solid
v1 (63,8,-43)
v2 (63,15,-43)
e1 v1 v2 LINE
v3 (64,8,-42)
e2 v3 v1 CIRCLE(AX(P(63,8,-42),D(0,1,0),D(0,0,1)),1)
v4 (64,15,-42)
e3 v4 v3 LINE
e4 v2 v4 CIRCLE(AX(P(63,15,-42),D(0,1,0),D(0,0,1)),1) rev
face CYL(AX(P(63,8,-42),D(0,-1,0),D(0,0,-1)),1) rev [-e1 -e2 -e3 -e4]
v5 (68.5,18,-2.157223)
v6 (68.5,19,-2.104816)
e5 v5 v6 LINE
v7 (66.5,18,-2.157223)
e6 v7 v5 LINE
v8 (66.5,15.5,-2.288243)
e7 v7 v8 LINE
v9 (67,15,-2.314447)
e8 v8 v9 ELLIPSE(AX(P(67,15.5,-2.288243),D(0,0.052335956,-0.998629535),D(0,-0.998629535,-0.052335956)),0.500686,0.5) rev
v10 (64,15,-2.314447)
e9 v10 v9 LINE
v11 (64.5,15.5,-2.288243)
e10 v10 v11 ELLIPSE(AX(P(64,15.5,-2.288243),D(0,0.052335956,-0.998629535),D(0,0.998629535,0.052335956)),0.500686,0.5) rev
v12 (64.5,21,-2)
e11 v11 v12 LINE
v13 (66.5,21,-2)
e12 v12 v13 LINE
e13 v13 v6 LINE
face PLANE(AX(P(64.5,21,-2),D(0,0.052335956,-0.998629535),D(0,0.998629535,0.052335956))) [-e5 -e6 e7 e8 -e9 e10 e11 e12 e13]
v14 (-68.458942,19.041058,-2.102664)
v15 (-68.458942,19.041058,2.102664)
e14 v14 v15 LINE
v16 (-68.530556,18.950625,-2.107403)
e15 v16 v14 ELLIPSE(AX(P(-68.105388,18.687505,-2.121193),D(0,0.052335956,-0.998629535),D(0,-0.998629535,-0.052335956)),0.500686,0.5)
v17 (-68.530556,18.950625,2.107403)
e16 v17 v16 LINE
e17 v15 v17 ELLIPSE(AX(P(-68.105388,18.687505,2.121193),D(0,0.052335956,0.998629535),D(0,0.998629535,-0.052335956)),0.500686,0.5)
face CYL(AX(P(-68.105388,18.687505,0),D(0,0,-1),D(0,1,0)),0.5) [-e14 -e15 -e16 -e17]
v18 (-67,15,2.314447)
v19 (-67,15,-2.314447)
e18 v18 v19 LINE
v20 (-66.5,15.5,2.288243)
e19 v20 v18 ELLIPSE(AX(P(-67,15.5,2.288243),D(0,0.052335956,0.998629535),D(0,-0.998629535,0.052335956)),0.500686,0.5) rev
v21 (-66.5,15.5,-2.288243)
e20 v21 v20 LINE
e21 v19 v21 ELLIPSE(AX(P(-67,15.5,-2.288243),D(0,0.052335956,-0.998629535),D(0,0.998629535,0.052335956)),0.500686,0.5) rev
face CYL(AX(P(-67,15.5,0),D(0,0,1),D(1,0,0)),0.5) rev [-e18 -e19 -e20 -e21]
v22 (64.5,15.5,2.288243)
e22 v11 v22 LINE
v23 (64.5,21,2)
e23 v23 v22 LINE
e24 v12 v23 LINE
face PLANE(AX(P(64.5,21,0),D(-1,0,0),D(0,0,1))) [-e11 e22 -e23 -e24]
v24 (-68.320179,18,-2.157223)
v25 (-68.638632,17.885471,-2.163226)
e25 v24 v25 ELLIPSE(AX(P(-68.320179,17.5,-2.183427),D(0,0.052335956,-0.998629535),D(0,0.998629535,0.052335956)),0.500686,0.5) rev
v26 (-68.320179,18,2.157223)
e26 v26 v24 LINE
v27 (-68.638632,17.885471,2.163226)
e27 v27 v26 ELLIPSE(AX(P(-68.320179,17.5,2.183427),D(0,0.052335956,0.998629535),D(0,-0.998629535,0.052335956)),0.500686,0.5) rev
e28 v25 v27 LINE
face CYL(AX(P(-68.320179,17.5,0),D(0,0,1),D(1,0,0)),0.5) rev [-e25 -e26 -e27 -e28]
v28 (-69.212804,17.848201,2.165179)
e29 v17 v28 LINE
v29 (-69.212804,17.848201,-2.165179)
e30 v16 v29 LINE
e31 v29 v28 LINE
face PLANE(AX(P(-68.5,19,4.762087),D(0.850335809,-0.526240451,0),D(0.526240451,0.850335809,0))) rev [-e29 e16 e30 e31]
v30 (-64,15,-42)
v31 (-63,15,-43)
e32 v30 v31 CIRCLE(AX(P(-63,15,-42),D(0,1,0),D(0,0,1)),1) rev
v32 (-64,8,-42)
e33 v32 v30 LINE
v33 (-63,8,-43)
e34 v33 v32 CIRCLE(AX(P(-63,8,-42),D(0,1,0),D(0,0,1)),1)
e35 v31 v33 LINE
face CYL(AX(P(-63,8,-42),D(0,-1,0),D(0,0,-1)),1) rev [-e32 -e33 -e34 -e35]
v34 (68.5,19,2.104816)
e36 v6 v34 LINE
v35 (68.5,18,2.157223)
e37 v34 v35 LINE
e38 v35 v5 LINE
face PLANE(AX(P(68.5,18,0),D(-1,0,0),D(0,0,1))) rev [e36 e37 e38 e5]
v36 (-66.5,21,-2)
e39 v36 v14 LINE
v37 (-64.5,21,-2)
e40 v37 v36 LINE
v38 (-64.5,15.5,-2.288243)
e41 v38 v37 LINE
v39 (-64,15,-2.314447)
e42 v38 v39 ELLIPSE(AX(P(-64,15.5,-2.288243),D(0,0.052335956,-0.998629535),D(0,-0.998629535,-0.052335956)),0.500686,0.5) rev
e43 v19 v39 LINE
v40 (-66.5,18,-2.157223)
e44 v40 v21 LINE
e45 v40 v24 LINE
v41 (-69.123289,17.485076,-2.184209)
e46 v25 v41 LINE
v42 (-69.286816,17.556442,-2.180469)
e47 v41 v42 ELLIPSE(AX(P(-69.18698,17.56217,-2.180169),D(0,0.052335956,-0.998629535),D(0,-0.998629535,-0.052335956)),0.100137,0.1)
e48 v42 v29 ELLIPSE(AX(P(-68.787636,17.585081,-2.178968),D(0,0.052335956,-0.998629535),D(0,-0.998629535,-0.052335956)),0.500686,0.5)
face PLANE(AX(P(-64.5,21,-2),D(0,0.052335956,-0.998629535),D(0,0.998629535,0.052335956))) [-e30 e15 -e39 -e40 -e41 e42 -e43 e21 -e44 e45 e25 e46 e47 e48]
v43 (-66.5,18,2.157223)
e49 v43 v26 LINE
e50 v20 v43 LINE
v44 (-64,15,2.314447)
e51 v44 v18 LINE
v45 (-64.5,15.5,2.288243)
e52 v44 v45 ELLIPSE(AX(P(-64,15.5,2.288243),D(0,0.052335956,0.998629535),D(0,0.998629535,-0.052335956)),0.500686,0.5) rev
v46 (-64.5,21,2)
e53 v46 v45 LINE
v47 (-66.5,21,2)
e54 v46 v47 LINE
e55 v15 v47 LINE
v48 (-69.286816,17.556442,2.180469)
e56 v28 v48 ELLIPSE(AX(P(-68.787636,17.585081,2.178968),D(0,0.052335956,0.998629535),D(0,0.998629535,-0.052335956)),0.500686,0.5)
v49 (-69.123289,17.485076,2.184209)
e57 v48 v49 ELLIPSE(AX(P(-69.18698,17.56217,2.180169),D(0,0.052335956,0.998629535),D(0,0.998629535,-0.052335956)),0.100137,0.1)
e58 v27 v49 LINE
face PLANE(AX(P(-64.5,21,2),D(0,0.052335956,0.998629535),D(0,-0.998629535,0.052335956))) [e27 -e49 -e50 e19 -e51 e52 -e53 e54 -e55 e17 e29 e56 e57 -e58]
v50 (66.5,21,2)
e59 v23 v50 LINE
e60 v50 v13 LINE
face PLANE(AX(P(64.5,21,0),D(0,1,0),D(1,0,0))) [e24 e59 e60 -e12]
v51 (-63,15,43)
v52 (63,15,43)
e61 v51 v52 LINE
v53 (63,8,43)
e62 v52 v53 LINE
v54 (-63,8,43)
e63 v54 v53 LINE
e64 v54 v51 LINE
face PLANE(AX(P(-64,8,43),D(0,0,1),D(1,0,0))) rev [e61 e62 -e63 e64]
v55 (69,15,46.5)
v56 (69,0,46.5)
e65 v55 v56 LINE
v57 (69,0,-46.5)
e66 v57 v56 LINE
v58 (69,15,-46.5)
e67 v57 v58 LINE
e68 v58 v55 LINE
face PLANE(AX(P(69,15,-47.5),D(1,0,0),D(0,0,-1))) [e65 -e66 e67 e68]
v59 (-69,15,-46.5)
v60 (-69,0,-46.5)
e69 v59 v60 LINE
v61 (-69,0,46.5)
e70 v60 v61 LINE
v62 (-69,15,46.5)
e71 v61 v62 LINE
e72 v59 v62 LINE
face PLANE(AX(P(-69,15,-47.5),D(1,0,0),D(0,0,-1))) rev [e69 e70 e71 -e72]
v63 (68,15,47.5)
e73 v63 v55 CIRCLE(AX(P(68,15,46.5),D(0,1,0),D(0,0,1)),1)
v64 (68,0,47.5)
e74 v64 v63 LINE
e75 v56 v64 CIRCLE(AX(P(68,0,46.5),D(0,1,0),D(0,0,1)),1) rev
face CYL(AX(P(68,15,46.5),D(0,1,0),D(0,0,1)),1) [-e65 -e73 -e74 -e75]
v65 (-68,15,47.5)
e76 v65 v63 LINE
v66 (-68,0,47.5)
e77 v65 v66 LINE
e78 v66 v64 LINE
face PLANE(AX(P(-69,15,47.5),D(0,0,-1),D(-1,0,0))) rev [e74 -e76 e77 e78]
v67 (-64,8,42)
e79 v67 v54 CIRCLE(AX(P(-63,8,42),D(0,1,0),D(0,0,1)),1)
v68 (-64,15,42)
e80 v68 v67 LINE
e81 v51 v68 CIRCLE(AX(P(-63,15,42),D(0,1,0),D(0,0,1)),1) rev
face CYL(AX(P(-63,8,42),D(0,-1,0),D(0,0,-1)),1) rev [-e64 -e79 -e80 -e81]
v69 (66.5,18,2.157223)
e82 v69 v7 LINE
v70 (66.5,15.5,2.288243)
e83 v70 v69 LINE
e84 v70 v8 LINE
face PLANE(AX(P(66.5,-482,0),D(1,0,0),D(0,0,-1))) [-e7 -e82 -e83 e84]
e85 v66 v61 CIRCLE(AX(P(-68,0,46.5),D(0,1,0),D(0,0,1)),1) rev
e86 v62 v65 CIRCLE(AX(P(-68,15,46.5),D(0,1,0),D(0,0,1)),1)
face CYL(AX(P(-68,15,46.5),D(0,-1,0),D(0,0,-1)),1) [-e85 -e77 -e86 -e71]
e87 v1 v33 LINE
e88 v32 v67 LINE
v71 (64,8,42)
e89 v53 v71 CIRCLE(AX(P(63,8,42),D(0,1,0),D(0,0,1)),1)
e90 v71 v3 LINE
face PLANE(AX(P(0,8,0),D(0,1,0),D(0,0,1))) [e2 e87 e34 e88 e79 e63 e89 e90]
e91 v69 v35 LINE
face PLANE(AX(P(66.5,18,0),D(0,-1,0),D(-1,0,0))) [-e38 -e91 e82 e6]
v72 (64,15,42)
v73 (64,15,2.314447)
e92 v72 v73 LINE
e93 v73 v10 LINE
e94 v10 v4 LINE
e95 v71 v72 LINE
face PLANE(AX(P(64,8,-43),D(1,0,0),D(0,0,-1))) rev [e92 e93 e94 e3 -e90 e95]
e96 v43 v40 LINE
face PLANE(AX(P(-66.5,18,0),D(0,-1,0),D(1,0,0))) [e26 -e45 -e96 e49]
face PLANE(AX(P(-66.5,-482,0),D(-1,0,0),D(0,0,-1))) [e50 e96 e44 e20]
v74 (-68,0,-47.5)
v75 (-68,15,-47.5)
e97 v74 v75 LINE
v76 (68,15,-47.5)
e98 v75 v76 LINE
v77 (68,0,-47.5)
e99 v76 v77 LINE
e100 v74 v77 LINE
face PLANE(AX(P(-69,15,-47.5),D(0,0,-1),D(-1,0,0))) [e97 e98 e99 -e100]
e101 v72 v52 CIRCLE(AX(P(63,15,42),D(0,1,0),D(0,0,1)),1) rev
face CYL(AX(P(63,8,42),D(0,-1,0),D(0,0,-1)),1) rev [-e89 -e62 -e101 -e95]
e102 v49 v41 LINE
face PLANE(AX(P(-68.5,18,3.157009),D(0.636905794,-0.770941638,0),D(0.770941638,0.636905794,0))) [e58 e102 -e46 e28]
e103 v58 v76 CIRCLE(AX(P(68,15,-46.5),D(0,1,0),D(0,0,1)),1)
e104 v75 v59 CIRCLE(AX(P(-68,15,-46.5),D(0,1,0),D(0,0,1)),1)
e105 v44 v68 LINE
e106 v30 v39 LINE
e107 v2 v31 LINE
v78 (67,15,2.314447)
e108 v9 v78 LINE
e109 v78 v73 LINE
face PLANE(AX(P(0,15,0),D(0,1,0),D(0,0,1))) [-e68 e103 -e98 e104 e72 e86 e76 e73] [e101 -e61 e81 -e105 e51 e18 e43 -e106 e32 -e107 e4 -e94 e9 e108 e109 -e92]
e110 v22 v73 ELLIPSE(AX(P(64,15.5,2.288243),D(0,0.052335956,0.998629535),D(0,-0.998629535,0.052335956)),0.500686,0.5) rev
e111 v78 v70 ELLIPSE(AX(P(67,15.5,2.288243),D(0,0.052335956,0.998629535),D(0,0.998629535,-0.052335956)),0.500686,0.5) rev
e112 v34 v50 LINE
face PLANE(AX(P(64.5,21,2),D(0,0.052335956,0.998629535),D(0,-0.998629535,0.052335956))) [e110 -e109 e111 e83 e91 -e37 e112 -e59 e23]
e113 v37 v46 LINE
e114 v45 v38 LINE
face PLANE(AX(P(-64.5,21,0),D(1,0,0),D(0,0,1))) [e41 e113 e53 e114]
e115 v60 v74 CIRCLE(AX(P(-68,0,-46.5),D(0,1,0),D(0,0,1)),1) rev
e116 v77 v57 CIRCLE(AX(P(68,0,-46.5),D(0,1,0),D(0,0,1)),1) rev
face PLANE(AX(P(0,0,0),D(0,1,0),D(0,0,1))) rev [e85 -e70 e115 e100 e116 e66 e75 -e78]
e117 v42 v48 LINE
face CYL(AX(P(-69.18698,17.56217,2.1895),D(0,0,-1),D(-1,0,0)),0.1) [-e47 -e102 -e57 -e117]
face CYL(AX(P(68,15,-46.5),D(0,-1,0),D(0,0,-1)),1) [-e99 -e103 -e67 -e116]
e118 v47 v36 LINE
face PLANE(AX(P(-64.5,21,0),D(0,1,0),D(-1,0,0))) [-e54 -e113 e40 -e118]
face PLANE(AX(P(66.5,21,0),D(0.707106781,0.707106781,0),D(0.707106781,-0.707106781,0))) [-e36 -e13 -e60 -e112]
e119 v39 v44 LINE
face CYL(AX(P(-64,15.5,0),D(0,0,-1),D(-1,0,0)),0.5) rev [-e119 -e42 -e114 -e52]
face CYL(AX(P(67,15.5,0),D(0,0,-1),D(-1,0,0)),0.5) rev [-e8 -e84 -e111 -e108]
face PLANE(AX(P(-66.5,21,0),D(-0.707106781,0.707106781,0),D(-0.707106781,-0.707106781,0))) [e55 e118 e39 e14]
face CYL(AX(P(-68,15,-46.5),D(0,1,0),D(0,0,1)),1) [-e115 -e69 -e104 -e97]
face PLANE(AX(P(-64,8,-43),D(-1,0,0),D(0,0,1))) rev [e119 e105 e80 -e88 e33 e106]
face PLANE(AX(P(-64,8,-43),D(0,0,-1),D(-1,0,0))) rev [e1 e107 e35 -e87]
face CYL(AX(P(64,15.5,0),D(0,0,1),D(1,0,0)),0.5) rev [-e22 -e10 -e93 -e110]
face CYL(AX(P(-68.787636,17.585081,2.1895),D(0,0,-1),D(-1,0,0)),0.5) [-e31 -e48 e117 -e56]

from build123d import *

# Parameters (mm, degrees)
SKETCH1_W           = 138
SKETCH1_H           = 95
BOSS_EXTRUDE1_DEPTH = 15
SKETCH2_W           = 128
SKETCH2_H           = 86
CUT_EXTRUDE1_DEPTH  = 7
SNAP_START          = 64.5
SNAP_HOOK2_DEPTH    = 2
SNAP_HOOK2_2_DEPTH  = 2
FILLET1_R           = 1
FILLET2_R           = 0.5
BOSS_EXTRUDE2_DEPTH = 2
FILLET3_R           = 0.5
FILLET4_R           = 0.5
FILLET7_R           = 0.1


with BuildPart() as part:
    # Sketch1 → Boss-Extrude1 (new body)
    with BuildSketch(Plane(origin=(0, 0, 0), x_dir=(1, 0, 0), z_dir=(0, 1, 0))):
        Rectangle(SKETCH1_W, SKETCH1_H)
    extrude(amount=BOSS_EXTRUDE1_DEPTH)

    # Sketch2 → Cut-Extrude1 (cut)
    with BuildSketch(Plane(origin=(0, 15, 0), x_dir=(1, 0, 0), z_dir=(0, 1, 0))):
        Rectangle(SKETCH2_W, SKETCH2_H)
    extrude(amount=-CUT_EXTRUDE1_DEPTH, mode=Mode.SUBTRACT)



with BuildPart() as body_2:
    # Snap Hook2: read off the stored shape, not the designer's step
    # Snap Hook2 outline → Snap Hook2 (new body)
    with BuildSketch(Plane.YZ.offset(SNAP_START)):
        Polygon((21, -2), (21, 2), (18, 2.157223338), (18, -2.157223338), align=None)
    snap_hook2 = extrude(amount=SNAP_HOOK2_DEPTH)


with BuildPart() as part_1:
    add(part.part)

    add(body_2.part)  # Snap Hook2 2 merges body 2
    # Snap Hook2 2 outline → Snap Hook2 2 (add)
    with BuildSketch(Plane.YZ.offset(SNAP_START)):
        Polygon((18, -2.157223338), (18, 2.157223338), (15, 2.314446676), (15, -2.314446676), align=None)
    snap_hook2_2 = extrude(amount=SNAP_HOOK2_2_DEPTH)

    # Snap Hook2 3: loft between two sections, ruled curve by curve
    snap_hook2_3_from = [
        Edge.make_line((66.5, 21, -2), (66.5, 21, 2)),
        Edge.make_line((66.5, 18, 2.157223338), (66.5, 18, -2.157223338)),
        Edge.make_line((66.5, 18, 2.157223338), (66.5, 21, 2)),
        Edge.make_line((66.5, 18, -2.157223338), (66.5, 21, -2)),
    ]
    snap_hook2_3_to = [
        Edge.make_line((68.5, 19, -2.104815559), (68.5, 19, 2.104815559)),
        Edge.make_line((68.5, 18, 2.157223338), (68.5, 18, -2.157223338)),
        Edge.make_line((68.5, 18, 2.157223338), (68.5, 19, 2.104815559)),
        Edge.make_line((68.5, 18, -2.157223338), (68.5, 19, -2.104815559)),
    ]
    snap_hook2_3 = Solid(Shell([*[Face.make_surface_from_curves(snap_hook2_3_from[k], snap_hook2_3_to[k]) for k in range(4)], Face(Wire(snap_hook2_3_from)), Face(Wire(snap_hook2_3_to))]))
    add(snap_hook2_3)

    # Fillet1
    fillet1_edges = [part_1.edges().sort_by_distance(p)[0] for p in [
        (64, 11.5, -43),
        (64, 11.5, 43),
        (-64, 11.5, 43),
        (-64, 11.5, -43),
        (-69, 7.5, -47.5),
        (69, 7.5, -47.5),
        (69, 7.5, 47.5),
        (-69, 7.5, 47.5),
    ]]
    fillet(fillet1_edges, radius=FILLET1_R)

    # Mirror1: Snap Hook2, Snap Hook2 2, Snap Hook2 3 across plane
    add(snap_hook2.mirror(Plane(origin=(0, 0, 0), x_dir=(0, 0, 1), z_dir=(1, 0, 0))))
    add(snap_hook2_2.mirror(Plane(origin=(0, 0, 0), x_dir=(0, 0, 1), z_dir=(1, 0, 0))))
    add(snap_hook2_3.mirror(Plane(origin=(0, 0, 0), x_dir=(0, 0, 1), z_dir=(1, 0, 0))))

    # Fillet2
    fillet2_edges = [part_1.edges().sort_by_distance(p)[0] for p in [
        (66.5, 15, 0),
        (64.5, 15, 0),
        (-66.5, 15, 0),
        (-64.5, 15, 0),
    ]]
    fillet(fillet2_edges, radius=FILLET2_R - 0.0001)  # a hair under: the kernel refuses the full size

    # Sketch5 → Boss-Extrude2 (add)
    with BuildSketch(Plane.ZY.offset(68.5)):
        Polygon((-2.104815559, 19), (2.104815559, 19), (2.189499682, 17.384130663), (-2.189499682, 17.384130663), align=None)
    extrude(amount=BOSS_EXTRUDE2_DEPTH)

    # Cut-Sweep1: sweep along a curve in space
    with BuildLine() as cut_sweep1_path:
        Line((-70.5, 17.384130663, -2.189499682), (-70.5, 17.384130663, 2.189499682))
    # Sketch6 → Cut-Sweep1 (sweep, cut)
    with BuildSketch(Plane(origin=(0, 0.162048562, -3.09207076), x_dir=(-1, 0, 0), z_dir=(0, 0.052335956242943814, -0.998629534754574))):
        Polygon((68.5, 17.862431279), (69.245478091, 17.245716756), (68.5, 17.245716756), align=None)
    sweep(path=cut_sweep1_path.line, mode=Mode.SUBTRACT)

    # Cut-Sweep2: sweep along a curve in space
    with BuildLine() as cut_sweep2_path:
        Line((-70.5, 17.384130663, -2.189499682), (-70.5, 17.384130663, 2.189499682))
    # Sketch7 → Cut-Sweep2 (sweep, cut)
    with BuildSketch(Plane(origin=(0, 0.162048562, -3.09207076), x_dir=(-1, 0, 0), z_dir=(0, 0.052335956242943814, -0.998629534754574))):
        Polygon((68.5, 18.863803625), (69.5, 17.245716756), (70.5, 17.245716756), (70.5, 18.863803625), align=None)
    sweep(path=cut_sweep2_path.line, mode=Mode.SUBTRACT)

    # Fillet3
    # the kernel refuses this fillet: 0.5 mm, written as the material it adds along each edge
    with BuildSketch(Plane(origin=(-68.5, 18, 2.606776404), x_dir=(1, 0, 0), z_dir=(0, 0, -1))) as fillet3_piece_1_section:
        with BuildLine():
            CenterArc((FILLET3_R * 0.359642452732, FILLET3_R), FILLET3_R, 230.43852258, 39.56147742)
            Line((-FILLET3_R * 0.277263341593, FILLET3_R * 0.22905836203), (0, 0))
            Line((0, 0), (FILLET3_R * 0.359642452732, 0))
        make_face()
    fillet3_piece_1 = extrude(amount=5.213552808, mode=Mode.PRIVATE)
    fillet3_piece_1 = split(fillet3_piece_1, bisect_by=Plane(origin=(-68.5, 17.976504454, 2.158454687), z_dir=(0, -0.052335956242943654, -0.9986295347545739)), keep=Keep.TOP, mode=Mode.PRIVATE)
    fillet3_piece_1 = split(fillet3_piece_1, bisect_by=Plane(origin=(-68.5, 18.248986786, -2.144174493), z_dir=(0, -0.05233595624294393, 0.9986295347545739)), keep=Keep.TOP, mode=Mode.PRIVATE)
    add(fillet3_piece_1)
    # the kernel refuses this fillet: 0.5 mm, written as the material it takes off along each edge
    with BuildSketch(Plane(origin=(-68.5, 19, -2.249978478), x_dir=(0.7071067811865781, 0.7071067811865169, 0), z_dir=(0, 0, 1))) as fillet3_2_piece_1:
        with BuildLine():
            CenterArc((FILLET3_R * 0.11613033532, -FILLET3_R), FILLET3_R, 90, 13.248212602)
            Line((-FILLET3_R * 0.11303968997, -FILLET3_R * 0.0266135918822), (0, 0))
            Line((0, 0), (FILLET3_R * 0.11613033532, 0))
        make_face()
    extrude(amount=4.499956956, mode=Mode.SUBTRACT)

    # Fillet4
    # the kernel refuses this fillet: 0.5 mm, written as the material it takes off along each edge
    with BuildSketch(Plane(origin=(-69.5, 17.384130663, -3.553874189), x_dir=(0.5262404509675064, 0.8503358088223238, 0), z_dir=(0, 0, 1))) as fillet4_piece_1:
        with BuildLine():
            CenterArc((0.545749803, -0.5), FILLET4_R, 90, 55.448844763)
            Line((0.133939724, -0.216429093), (0.125703523, -0.210757675))
            ThreePointArc((0.125703523, -0.210757675), (0.058466504, -0.113476951), (-0.008503358, -0.005262405))
            Line((-0.008503358, -0.005262405), (0, 0.01))
            Line((0, 0.01), (0.545749803, 0.01))
            Line((0.545749803, 0.01), (0.545749803, 0))
        make_face()
    extrude(amount=7.107748378, mode=Mode.SUBTRACT)

    # Fillet7
    fillet7_edges = [part_1.edges().sort_by_distance(p)[0] for p in [
        (-69.245478091, 17.384130663, 0),
    ]]
    fillet(fillet7_edges, radius=FILLET7_R)


solid = part_1.part
